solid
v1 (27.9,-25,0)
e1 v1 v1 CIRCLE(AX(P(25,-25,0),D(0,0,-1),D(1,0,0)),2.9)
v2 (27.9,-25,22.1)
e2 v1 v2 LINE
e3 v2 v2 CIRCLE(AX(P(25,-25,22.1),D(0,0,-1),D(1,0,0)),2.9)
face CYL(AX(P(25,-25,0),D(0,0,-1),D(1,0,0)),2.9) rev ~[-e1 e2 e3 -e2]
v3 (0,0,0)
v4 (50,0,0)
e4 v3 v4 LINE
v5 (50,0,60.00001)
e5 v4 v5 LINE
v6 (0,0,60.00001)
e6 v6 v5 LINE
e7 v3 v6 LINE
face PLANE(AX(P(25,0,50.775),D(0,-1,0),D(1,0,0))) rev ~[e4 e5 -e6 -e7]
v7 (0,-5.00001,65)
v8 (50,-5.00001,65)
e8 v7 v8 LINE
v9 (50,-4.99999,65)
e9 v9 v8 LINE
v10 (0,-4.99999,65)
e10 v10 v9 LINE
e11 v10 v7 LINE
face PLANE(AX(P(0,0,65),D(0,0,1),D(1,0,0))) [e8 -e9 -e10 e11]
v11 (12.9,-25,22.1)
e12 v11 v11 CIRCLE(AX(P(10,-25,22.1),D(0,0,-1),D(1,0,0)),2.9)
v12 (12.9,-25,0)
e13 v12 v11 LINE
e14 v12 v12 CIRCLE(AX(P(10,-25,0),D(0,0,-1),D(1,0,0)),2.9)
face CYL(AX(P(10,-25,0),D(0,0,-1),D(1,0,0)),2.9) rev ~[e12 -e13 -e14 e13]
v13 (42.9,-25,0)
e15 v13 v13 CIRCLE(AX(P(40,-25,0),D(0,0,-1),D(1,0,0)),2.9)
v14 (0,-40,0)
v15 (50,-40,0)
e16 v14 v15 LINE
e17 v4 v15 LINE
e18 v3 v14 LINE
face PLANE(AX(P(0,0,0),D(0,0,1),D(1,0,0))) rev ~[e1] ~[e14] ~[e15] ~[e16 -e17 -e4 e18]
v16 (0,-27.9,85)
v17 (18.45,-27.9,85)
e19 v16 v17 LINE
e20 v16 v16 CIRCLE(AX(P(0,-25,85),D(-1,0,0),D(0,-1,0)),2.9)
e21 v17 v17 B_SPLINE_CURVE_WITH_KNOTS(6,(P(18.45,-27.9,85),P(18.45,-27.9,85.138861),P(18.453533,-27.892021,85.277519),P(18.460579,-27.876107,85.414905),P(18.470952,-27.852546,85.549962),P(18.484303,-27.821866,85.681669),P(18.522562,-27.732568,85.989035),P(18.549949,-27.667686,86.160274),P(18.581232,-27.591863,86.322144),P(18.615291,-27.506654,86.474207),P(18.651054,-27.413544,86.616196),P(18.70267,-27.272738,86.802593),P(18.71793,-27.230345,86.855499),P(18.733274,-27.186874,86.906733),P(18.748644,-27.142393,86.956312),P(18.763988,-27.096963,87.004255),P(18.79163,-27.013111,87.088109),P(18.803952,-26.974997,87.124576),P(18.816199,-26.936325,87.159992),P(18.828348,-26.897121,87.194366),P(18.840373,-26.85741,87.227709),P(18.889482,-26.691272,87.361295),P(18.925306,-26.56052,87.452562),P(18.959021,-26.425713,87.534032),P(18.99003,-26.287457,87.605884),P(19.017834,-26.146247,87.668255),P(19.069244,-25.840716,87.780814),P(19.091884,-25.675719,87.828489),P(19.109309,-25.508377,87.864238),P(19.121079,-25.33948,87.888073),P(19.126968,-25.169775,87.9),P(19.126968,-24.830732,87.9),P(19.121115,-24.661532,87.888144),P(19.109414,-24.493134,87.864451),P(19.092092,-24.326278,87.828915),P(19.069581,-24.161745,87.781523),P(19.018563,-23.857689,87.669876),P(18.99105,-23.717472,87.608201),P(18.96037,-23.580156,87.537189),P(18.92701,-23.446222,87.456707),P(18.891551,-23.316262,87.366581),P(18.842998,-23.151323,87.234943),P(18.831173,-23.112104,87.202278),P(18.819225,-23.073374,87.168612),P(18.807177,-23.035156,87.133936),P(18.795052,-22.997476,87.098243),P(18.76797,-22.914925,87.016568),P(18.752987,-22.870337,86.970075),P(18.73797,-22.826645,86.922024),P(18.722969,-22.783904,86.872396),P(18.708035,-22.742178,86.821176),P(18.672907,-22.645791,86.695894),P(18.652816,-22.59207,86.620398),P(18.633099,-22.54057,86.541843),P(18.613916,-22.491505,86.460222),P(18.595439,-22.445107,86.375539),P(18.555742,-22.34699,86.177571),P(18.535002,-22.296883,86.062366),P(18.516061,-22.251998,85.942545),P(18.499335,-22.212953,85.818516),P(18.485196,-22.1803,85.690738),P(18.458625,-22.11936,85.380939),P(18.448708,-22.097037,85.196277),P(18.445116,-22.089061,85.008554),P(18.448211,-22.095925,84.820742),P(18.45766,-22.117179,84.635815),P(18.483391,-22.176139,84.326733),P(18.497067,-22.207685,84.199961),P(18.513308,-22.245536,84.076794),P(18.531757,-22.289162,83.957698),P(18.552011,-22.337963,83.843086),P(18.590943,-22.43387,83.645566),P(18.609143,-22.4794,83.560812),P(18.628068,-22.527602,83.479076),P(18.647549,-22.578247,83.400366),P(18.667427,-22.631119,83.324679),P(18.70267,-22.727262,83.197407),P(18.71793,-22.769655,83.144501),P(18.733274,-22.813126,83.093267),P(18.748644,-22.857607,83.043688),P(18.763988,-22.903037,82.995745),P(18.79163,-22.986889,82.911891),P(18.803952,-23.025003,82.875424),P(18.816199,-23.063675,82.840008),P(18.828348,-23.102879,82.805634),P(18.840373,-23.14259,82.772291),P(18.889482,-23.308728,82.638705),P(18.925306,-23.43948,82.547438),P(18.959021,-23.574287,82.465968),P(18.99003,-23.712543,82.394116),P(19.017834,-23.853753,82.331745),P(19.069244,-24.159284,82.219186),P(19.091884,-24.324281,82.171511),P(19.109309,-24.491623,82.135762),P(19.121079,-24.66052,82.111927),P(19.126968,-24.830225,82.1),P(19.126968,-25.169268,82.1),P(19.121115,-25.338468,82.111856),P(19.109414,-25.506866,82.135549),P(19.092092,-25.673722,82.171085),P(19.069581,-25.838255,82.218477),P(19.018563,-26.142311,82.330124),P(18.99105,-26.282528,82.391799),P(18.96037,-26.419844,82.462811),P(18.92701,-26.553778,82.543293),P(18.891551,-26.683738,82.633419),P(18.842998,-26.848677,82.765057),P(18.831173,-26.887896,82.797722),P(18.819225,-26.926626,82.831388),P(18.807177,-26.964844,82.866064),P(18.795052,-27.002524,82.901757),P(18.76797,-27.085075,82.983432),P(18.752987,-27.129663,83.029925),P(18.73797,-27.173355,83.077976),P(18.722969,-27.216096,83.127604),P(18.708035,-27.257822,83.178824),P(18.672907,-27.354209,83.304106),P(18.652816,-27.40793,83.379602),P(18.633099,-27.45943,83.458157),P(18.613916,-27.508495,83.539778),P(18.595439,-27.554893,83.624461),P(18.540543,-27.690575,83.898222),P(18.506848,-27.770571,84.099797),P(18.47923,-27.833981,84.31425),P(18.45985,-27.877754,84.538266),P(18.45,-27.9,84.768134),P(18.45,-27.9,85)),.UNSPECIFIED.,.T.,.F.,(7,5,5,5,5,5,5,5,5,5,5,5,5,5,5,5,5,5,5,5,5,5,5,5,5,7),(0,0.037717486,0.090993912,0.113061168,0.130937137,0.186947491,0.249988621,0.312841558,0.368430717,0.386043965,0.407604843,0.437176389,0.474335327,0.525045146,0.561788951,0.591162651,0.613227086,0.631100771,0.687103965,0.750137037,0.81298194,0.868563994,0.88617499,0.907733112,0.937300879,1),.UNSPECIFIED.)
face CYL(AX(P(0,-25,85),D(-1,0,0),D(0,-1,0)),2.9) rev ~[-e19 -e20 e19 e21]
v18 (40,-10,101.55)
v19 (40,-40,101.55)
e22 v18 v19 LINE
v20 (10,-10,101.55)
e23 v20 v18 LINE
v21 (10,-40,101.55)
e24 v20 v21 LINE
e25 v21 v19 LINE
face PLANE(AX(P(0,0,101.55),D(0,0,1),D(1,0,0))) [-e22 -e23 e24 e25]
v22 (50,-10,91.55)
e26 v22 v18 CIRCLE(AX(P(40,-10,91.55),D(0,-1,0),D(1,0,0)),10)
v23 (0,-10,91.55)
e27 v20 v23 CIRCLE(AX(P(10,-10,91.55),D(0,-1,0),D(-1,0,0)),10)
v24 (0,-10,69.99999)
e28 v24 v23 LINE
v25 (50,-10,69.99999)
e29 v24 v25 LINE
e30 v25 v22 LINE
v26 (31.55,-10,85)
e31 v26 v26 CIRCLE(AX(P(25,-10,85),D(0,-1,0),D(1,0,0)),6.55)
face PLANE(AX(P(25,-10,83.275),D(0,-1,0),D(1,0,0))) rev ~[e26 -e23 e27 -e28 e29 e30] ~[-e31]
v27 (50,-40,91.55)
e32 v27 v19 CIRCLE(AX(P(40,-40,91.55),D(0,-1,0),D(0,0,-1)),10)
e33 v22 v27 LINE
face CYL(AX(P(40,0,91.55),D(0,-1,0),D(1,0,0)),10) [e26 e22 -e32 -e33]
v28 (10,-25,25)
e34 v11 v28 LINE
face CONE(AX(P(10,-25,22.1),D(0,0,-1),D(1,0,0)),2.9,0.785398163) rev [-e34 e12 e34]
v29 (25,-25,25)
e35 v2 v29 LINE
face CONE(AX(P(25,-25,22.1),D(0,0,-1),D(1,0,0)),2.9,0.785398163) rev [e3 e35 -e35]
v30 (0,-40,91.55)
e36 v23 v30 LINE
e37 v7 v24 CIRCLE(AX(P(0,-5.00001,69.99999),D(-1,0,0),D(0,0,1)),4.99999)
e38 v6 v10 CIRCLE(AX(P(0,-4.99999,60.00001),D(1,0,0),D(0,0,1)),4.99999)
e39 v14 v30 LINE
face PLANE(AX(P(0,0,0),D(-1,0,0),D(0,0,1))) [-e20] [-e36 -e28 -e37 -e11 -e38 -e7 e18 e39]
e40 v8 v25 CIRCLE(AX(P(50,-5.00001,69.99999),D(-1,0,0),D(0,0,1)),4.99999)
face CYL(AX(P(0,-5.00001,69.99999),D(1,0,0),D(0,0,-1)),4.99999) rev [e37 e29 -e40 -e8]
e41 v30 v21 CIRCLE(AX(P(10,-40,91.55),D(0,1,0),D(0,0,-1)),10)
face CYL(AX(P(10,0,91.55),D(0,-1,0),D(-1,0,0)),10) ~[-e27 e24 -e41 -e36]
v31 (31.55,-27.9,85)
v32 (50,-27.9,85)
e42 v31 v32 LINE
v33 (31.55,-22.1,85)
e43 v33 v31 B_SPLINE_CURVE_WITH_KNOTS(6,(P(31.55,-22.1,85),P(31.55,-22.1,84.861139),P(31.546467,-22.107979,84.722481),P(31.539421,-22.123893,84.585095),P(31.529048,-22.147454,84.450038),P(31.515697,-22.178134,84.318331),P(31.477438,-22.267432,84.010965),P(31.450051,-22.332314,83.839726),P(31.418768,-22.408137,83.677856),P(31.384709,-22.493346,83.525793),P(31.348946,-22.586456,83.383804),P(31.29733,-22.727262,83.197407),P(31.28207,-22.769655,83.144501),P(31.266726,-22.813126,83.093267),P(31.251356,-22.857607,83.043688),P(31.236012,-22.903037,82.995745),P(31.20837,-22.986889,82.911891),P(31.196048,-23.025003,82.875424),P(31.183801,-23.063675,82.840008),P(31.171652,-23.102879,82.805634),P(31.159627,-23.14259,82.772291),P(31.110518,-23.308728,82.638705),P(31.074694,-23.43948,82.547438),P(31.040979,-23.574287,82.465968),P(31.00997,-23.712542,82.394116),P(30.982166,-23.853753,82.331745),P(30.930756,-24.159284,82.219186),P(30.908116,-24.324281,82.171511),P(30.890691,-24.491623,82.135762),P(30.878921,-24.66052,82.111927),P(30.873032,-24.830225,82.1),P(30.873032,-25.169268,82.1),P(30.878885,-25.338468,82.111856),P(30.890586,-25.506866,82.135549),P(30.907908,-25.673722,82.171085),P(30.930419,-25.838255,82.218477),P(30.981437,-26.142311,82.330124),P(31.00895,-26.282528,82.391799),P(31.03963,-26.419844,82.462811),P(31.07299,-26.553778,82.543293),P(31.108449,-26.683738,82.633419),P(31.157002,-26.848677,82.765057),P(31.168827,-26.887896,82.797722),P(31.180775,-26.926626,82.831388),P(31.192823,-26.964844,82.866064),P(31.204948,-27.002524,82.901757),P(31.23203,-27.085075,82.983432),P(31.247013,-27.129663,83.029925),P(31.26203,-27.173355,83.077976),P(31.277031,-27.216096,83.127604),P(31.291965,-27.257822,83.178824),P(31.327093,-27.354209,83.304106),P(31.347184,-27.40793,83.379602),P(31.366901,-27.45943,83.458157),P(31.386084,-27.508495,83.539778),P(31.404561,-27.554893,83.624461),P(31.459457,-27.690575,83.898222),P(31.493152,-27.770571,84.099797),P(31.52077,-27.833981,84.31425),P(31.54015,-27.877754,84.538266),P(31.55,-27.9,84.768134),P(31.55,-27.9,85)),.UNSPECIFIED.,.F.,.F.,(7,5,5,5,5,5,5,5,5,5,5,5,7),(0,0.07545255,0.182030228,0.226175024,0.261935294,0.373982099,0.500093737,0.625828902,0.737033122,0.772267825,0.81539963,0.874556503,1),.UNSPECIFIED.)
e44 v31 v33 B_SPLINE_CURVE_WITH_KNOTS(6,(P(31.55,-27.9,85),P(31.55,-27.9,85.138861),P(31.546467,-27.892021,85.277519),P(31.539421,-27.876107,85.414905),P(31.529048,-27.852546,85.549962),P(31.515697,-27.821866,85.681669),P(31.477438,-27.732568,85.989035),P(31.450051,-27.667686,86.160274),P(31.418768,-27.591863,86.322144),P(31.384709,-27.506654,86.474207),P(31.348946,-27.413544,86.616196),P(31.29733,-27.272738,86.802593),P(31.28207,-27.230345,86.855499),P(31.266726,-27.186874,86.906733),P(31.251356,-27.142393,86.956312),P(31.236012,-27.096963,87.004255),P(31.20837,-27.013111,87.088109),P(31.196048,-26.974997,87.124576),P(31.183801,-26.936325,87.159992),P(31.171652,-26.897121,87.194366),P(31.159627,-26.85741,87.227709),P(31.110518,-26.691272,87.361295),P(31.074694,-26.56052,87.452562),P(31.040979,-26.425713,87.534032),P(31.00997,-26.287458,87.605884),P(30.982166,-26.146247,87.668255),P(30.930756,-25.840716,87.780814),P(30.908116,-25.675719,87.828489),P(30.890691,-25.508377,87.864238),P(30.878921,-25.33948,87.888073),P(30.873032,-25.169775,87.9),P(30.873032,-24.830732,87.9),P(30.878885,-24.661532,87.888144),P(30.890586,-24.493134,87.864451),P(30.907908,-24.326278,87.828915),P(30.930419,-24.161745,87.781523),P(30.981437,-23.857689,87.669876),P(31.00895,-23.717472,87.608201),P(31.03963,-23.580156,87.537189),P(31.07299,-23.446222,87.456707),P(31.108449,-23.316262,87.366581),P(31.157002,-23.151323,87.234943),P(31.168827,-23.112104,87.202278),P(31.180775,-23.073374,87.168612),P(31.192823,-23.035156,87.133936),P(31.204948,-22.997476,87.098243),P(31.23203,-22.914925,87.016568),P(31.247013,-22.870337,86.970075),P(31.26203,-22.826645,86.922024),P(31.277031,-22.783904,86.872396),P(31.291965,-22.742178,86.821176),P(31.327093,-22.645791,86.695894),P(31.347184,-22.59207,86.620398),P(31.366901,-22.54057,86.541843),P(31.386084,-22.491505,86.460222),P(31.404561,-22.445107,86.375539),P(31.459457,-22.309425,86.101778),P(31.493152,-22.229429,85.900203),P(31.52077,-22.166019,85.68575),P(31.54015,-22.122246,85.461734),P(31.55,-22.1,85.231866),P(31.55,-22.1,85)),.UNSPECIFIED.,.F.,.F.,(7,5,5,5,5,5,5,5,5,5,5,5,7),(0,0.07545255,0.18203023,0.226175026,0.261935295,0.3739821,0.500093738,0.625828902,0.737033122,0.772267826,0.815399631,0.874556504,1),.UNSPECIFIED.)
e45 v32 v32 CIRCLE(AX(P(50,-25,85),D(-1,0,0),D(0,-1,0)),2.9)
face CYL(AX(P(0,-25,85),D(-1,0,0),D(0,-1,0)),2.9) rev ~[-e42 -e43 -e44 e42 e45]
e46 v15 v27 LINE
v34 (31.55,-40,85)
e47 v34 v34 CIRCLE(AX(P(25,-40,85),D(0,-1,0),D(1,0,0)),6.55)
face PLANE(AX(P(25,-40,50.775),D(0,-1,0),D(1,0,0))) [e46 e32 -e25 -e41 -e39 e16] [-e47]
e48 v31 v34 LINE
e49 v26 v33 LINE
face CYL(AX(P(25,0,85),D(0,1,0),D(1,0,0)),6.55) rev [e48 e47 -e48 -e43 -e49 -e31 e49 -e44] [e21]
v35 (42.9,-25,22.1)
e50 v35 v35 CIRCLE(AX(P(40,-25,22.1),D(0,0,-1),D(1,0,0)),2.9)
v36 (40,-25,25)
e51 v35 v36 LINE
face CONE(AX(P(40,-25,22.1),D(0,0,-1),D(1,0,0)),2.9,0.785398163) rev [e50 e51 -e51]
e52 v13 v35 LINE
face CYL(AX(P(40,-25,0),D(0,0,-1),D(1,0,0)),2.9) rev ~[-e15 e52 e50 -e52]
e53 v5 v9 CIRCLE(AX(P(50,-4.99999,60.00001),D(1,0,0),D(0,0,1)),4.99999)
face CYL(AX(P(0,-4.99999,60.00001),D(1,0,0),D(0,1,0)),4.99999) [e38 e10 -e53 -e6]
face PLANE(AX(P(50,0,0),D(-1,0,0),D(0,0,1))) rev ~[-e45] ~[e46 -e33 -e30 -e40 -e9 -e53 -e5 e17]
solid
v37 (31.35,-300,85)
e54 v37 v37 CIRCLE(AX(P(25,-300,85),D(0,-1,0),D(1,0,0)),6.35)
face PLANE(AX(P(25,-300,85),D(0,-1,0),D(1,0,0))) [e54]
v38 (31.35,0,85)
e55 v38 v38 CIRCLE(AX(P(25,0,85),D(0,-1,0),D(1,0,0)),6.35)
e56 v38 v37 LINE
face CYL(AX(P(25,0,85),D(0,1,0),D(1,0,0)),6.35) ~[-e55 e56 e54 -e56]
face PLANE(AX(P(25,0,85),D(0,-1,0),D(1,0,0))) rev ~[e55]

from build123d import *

# Parameters (mm, degrees)
F0_W      = 50
F0_H      = 101.55
F0_R      = 6.55
F1_DEPTH  = 40
F3_R      = 2.9
F4_DEPTH  = 50.001
F5_R      = 2.9
F6_DEPTH  = 25
F7_SIZE   = 2.9
F8_R      = 10
F9_W      = 50
F9_H      = 36.55
F9_R      = 6.55
F10_DEPTH = 10
F11_R     = 4.99999
F0_R_2    = 6.35
F12_DEPTH = 300


# Not quite as in the source:
# - a fillet or chamfer is up to 0.001 mm smaller than in the source, because OpenCascade refuses the exact size


with BuildPart() as f1:
    # F0 (on Front) → F1 (new body)
    with BuildSketch(Plane.XZ):
        with Locations((25, 50.775)):
            Rectangle(F0_W, F0_H)
        with Locations((25, 85)):
            Circle(F0_R, mode=Mode.SUBTRACT)
    extrude(amount=F1_DEPTH)

    # F3 (on face) → F4 (cut, through all)
    with BuildSketch(Plane(origin=(0, 0, 0), x_dir=(0, -1, 0), z_dir=(-1, 0, 0))):
        with Locations((25, 85)):
            Circle(F3_R)
    extrude(amount=-F4_DEPTH, mode=Mode.SUBTRACT)

    # F5 (on face) → F6 (cut)
    with BuildSketch(Plane(origin=(0, 0, 0), x_dir=(1, 0, 0), z_dir=(0, 0, -1))):
        with Locations((10, 25)):
            Circle(F5_R)
        with Locations((25, 25)):
            Circle(F5_R)
        with Locations((40, 25)):
            Circle(F5_R)
    extrude(amount=-F6_DEPTH, mode=Mode.SUBTRACT)

    # F7
    f7_edges = [f1.edges().sort_by_distance(p)[0] for p in [
        (22.1, -25, 25),
        (7.1, -25, 25),
        (37.1, -25, 25),
    ]]
    chamfer(f7_edges, length=F7_SIZE)

    # F8
    f8_edges = [f1.edges().sort_by_distance(p)[0] for p in [
        (50, -20, 101.55),
        (0, -20, 101.55),
    ]]
    fillet(f8_edges, radius=F8_R)

    # F9 (on face) → F10 (cut)
    with BuildSketch(Plane.XZ):
        with Locations((25, 83.275)):
            Rectangle(F9_W, F9_H)
        with Locations((25, 85)):
            Circle(F9_R, mode=Mode.SUBTRACT)
    extrude(amount=F10_DEPTH, mode=Mode.SUBTRACT)

    # F11 (radius 5 in the source; OpenCascade refuses exactly that, so slightly less here)
    f11_edges = [f1.edges().sort_by_distance(p)[0] for p in [
        (25, -10, 65),
        (25, 0, 65),
    ]]
    fillet(f11_edges, radius=F11_R)


with BuildPart() as f12:
    # F0 (on Front) → F12 (new body)
    with BuildSketch(Plane.XZ):
        with Locations((25, 85)):
            Circle(F0_R_2)
    extrude(amount=F12_DEPTH)


solid = Compound([f1.part, f12.part])
